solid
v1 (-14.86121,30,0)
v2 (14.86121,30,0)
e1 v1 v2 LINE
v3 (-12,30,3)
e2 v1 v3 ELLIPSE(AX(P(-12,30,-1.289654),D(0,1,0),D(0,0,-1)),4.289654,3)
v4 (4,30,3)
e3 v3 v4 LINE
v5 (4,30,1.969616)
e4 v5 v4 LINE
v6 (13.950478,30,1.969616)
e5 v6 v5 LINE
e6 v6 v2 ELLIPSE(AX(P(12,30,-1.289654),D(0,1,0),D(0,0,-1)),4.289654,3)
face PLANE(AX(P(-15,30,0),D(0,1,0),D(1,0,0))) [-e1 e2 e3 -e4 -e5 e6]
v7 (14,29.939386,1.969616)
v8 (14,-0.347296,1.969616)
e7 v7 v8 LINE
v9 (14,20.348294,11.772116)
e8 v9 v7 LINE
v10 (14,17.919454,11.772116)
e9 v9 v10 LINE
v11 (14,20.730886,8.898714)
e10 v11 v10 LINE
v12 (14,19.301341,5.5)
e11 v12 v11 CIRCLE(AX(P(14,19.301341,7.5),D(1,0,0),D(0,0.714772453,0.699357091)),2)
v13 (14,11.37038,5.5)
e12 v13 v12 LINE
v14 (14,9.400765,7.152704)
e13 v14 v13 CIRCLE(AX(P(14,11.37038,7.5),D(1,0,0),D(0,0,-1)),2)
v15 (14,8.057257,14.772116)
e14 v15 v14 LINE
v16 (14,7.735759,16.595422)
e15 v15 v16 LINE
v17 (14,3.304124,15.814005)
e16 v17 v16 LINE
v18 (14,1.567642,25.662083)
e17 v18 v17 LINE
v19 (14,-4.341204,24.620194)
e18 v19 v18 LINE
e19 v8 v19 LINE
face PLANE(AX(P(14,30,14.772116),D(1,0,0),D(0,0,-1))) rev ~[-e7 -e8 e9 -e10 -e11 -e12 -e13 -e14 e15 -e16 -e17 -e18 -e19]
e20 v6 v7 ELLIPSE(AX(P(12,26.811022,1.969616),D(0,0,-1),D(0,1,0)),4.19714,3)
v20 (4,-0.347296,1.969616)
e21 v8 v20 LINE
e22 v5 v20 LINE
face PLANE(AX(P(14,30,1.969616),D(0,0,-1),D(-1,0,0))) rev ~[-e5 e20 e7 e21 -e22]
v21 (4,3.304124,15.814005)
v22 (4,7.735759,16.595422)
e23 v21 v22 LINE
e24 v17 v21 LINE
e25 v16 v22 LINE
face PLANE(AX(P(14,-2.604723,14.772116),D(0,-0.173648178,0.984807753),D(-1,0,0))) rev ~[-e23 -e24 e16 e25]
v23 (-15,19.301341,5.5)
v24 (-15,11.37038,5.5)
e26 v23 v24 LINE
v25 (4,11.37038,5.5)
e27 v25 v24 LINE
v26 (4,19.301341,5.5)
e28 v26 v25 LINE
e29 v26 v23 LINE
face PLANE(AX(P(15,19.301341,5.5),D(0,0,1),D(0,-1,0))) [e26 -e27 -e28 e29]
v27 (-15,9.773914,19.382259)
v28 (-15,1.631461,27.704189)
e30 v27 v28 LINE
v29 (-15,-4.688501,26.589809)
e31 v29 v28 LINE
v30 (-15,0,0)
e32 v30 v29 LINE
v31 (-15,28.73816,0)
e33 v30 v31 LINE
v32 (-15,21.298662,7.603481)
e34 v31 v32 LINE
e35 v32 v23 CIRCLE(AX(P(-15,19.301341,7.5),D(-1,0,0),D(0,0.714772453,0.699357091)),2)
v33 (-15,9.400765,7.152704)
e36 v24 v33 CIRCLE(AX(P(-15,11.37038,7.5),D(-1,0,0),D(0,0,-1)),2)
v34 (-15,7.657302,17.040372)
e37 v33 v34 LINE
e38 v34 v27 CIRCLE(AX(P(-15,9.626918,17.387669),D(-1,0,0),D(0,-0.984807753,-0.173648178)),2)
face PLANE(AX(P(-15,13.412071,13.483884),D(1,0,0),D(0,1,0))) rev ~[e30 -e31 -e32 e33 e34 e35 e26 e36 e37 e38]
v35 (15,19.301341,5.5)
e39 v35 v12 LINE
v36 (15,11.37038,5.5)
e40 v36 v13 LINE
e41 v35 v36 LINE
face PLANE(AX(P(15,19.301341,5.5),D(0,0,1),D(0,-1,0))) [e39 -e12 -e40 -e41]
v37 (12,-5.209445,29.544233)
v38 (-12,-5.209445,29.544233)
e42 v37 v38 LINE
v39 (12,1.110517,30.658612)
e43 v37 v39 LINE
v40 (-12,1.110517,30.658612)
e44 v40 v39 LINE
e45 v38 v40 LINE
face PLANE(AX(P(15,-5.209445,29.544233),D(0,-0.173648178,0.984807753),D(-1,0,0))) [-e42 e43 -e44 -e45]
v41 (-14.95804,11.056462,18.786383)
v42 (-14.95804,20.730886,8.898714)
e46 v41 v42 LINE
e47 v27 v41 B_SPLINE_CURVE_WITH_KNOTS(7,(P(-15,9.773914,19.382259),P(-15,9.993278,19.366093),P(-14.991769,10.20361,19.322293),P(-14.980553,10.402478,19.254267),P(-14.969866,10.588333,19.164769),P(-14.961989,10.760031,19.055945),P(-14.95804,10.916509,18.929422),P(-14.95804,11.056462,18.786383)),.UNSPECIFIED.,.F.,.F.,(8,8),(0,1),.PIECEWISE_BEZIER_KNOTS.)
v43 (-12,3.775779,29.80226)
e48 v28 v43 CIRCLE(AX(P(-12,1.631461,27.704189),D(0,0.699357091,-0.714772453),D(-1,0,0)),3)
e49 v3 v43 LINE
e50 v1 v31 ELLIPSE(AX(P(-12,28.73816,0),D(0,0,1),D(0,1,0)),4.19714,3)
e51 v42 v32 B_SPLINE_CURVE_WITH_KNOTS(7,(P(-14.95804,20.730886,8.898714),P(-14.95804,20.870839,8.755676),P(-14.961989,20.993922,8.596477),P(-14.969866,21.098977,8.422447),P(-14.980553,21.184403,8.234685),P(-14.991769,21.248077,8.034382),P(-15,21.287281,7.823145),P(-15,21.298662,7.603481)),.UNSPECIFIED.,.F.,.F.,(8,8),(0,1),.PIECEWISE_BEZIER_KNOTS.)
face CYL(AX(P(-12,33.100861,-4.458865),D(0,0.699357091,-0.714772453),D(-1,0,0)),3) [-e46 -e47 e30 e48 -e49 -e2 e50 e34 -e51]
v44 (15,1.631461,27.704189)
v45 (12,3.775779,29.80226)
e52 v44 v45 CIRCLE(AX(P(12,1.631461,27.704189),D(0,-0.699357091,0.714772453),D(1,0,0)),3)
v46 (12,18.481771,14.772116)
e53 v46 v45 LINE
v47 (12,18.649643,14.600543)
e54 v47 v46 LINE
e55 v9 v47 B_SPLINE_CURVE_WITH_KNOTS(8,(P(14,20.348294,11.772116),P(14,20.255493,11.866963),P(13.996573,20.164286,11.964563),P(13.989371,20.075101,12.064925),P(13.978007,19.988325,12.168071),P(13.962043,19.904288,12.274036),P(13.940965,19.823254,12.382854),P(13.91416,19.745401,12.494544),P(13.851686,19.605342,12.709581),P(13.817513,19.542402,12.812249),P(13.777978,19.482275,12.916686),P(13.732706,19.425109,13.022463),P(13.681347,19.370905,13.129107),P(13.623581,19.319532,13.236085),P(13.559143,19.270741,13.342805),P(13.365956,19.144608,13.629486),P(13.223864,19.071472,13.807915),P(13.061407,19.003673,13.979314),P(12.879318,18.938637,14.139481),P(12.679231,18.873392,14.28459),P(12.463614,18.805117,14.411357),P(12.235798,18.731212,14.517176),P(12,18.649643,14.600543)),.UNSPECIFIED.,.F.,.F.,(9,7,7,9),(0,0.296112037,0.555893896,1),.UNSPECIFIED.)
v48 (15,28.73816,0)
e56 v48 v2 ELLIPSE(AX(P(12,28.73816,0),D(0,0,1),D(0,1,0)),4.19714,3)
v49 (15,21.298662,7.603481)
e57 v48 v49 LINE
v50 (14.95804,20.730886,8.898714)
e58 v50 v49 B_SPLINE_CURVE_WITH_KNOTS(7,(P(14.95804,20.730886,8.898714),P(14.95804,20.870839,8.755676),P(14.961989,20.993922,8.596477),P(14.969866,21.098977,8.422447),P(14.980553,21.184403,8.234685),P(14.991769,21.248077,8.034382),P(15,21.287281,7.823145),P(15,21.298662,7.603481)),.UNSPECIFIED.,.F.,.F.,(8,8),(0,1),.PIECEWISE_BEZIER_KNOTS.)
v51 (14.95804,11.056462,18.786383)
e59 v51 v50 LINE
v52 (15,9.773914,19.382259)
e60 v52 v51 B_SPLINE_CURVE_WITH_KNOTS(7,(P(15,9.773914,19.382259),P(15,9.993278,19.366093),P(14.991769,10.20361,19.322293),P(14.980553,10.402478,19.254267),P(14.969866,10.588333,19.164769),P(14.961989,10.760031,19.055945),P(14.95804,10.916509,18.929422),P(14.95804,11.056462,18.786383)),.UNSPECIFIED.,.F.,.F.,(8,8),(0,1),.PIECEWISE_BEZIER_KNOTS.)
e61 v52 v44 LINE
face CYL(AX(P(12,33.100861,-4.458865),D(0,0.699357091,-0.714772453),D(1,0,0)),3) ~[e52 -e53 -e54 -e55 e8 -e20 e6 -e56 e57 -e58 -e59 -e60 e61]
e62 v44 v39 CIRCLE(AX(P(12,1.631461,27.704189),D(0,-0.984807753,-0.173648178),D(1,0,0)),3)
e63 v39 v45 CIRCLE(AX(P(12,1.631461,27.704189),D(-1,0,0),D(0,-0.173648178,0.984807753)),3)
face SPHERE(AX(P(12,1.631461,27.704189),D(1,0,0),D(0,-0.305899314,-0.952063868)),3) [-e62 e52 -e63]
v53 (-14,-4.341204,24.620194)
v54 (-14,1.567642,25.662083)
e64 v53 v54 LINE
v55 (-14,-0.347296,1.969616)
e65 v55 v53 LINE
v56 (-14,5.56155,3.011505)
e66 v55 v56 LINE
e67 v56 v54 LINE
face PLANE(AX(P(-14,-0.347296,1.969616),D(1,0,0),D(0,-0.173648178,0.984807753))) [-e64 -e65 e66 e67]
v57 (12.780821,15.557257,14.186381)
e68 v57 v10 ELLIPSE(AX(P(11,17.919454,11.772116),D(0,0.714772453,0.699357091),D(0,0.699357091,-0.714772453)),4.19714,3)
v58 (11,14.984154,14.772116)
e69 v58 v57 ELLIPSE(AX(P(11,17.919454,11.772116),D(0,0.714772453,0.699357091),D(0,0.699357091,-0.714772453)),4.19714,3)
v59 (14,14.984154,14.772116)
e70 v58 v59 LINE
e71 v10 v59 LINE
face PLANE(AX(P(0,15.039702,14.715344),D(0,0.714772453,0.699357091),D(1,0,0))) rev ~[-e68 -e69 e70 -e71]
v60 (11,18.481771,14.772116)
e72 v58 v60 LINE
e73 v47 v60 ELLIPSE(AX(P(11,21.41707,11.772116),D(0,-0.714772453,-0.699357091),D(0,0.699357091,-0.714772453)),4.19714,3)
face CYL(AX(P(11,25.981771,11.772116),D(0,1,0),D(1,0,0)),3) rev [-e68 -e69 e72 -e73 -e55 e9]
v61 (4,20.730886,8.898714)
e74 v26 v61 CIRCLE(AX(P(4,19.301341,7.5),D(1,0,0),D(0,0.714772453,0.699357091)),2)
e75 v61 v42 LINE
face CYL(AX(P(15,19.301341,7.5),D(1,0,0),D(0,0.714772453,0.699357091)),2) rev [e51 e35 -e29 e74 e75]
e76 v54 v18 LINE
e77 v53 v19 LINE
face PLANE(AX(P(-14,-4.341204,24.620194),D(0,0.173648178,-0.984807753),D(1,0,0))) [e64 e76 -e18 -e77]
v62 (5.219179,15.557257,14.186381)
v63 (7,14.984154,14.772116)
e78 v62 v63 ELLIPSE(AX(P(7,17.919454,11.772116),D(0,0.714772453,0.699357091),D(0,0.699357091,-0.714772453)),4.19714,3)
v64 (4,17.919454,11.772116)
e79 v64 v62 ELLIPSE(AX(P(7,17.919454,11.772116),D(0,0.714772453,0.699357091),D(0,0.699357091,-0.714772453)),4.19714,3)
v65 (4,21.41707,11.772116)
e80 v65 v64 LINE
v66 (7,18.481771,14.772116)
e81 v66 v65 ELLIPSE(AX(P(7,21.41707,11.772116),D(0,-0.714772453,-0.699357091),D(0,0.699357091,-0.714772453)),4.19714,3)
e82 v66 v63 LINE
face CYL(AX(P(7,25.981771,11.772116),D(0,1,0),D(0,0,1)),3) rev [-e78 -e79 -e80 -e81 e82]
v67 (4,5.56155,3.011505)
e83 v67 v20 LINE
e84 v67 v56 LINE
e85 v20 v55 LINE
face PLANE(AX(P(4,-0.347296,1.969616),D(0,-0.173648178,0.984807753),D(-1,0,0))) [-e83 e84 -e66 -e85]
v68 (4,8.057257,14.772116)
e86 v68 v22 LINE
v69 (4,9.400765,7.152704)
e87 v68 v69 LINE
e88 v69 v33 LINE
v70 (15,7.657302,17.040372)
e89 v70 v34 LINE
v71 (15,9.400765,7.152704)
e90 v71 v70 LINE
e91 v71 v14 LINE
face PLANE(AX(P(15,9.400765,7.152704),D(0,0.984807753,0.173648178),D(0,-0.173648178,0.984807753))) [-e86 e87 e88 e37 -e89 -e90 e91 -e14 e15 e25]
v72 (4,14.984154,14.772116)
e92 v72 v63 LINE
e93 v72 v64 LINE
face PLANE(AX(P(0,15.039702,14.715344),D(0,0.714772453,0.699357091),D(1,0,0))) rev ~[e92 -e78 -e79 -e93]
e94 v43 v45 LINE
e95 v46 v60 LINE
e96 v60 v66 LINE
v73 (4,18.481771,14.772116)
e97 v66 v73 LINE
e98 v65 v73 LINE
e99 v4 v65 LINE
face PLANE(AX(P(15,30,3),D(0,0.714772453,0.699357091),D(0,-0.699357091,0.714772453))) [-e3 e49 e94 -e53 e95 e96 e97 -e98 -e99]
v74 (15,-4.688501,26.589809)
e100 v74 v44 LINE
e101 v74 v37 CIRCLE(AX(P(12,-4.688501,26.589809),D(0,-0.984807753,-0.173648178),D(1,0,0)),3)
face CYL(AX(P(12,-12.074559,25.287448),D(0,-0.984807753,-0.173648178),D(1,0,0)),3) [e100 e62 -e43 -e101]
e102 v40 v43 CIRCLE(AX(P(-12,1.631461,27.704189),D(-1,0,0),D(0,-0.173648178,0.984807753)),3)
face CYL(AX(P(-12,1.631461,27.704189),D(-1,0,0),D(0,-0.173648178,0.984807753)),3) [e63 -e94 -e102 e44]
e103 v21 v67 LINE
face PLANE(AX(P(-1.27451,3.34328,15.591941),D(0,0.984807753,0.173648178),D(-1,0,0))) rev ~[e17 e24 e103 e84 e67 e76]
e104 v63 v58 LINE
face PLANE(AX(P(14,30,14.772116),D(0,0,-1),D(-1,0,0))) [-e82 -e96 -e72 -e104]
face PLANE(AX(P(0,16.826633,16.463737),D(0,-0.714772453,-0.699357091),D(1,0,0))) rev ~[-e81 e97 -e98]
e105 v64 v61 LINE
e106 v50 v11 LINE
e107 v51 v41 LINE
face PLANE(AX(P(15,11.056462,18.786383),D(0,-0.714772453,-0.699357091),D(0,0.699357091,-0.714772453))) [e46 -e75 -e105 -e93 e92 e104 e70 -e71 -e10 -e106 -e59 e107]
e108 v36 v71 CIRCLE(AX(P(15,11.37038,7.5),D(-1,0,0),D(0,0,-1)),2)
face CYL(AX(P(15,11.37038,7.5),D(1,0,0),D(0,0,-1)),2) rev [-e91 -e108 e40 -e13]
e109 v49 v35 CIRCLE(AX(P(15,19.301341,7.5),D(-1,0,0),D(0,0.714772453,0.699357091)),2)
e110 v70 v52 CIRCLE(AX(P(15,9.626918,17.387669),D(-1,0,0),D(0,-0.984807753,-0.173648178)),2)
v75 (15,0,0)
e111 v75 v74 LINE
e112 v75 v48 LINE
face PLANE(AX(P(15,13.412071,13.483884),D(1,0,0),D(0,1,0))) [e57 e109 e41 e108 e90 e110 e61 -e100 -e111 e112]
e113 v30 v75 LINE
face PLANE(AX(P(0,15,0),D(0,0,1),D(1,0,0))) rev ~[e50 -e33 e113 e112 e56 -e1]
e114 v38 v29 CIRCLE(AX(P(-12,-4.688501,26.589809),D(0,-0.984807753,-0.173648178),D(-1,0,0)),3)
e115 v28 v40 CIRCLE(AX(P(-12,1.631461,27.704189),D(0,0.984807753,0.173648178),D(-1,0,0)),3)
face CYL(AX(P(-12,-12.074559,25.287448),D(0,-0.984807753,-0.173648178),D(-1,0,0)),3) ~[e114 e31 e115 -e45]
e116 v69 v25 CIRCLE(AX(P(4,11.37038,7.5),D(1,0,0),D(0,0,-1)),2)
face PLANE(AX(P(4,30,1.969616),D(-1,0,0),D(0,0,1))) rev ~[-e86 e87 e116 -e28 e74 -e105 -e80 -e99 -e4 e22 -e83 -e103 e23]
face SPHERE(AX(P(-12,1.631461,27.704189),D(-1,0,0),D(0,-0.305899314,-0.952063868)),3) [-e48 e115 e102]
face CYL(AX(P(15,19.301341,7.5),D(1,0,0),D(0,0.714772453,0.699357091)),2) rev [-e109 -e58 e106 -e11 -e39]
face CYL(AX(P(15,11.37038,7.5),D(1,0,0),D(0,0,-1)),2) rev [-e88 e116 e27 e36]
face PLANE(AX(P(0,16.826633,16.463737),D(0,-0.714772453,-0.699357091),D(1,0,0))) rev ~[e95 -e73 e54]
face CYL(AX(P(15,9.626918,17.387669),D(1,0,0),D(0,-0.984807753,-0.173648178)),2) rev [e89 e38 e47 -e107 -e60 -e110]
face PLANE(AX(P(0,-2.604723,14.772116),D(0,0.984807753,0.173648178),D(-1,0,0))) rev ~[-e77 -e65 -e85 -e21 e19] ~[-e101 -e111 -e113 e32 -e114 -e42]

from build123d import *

# Parameters (mm, degrees)
F0_W          = 30
F0_H          = 30
F4_DEPTH      = 3
F3_W          = 30
F3_H          = 30
F5_DEPTH      = 8
F6_DEPTH      = 25
F8_DEPTH      = 6.0000000522
F10_DEPTH     = 30
F7_W          = 10
F7_H          = 11.7721162952
F7_H_2        = 1.030384494
F11_DEPTH     = 35.21044533
F12_T4_DEPTH  = 18.4976166065
F12_T10_DEPTH = 18.4976166065
F12_T15_DEPTH = 17.5385665297
F12_T20_DEPTH = 17.5385665297
F12_T26_DEPTH = 17.5385665297
F12_T31_DEPTH = 17.5385665297
F12_T37_DEPTH = 18.4976166065
F12_T43_DEPTH = 18.4976166065
F12_T45_DEPTH = 13.9174578279
F12_T47_DEPTH = 24
F12_T49_DEPTH = 44.997612514
F12_T54_DEPTH = 3
F12_T60_DEPTH = 3
F3_W_2        = 10
F3_H_2        = 13
F13_DEPTH     = 5.1313021672
F14_DEPTH     = 10.5


# Not quite as in the source:
# - a fillet or chamfer that OpenCascade refuses, or shapes differently, is made with other operations: its cross-section is extruded or revolved along the edge and cut away or added


with BuildPart() as f4:
    # F0 (on Top) → F4 (new body)
    with BuildSketch(Plane.XY):
        with Locations((0, 15)):
            Rectangle(F0_W, F0_H)
    extrude(amount=F4_DEPTH)

    # F3 (on 3pt) → F5 (join)
    with BuildSketch(Plane(origin=(0, 0, 0), x_dir=(-1, 0, 0), z_dir=(0, 0.984807753, 0.1736481777))):
        with Locations((0, 15)):
            Rectangle(F3_W, F3_H)
        Polygon((-14, 2), (-14, 15), (-14, 25), (14, 25), (14, 2), (-4, 2), align=None, mode=Mode.SUBTRACT)
        Polygon((-14, 25), (-14, 15), (-4, 15), (-4, 2), (14, 2), (14, 25), align=None)
    extrude(amount=F5_DEPTH)

    # F0 (on Top) → F6 (cut)
    with BuildSketch(Plane.XY):
        with Locations((0, 15)):
            Rectangle(F0_W, F0_H)
    extrude(amount=-F6_DEPTH, mode=Mode.SUBTRACT)

    # F3 (on 3pt) → F8 (cut)
    with BuildSketch(Plane(origin=(0, 0, 0), x_dir=(-1, 0, 0), z_dir=(0, 0.984807753, 0.1736481777))):
        Polygon((-14, 25), (-14, 15), (-4, 15), (-4, 2), (14, 2), (14, 25), align=None)
    extrude(amount=F8_DEPTH, mode=Mode.SUBTRACT)

    # F9 (on face) → F10 (join, through all)
    with BuildSketch(Plane.YZ.offset(15)):
        Polygon((30, 3), (2.6690166941, 30.9334180117), (7.594431953, 3), align=None)
        with BuildLine():
            ThreePointArc((11.3703802933, 5.5), (10.0848050739, 5.9679111138), (9.4007647872, 7.1527036447))
            Line((9.4007647872, 7.1527036447), (7.6573020205, 17.0403723366))
            ThreePointArc((7.6573020205, 17.0403723366), (8.7131028501, 19.1666972856), (11.0564624317, 18.7863828744))
            Line((11.0564624317, 18.7863828744), (20.7308856563, 8.8987141825))
            ThreePointArc((20.7308856563, 8.8987141825), (21.1449009434, 6.7245737833), (19.3013407511, 5.5))
            Line((19.3013407511, 5.5), (11.3703802933, 5.5))
        make_face(mode=Mode.SUBTRACT)
    extrude(amount=-F10_DEPTH)

    # F7 (on face) → F11 (cut, through all)
    with BuildSketch(Plane(origin=(0, 30, 0), x_dir=(-1, 0, 0), z_dir=(0, 1, 0))):
        with Locations((-9, 8.8860581476)):
            Rectangle(F7_W, F7_H)
        with Locations((-9, 2.484807753)):
            Rectangle(F7_W, F7_H_2)
    extrude(amount=-F11_DEPTH, mode=Mode.SUBTRACT)

    # F12: fillet of radius 3 on 9 edges, made by hand


with BuildPart() as f12_tool2:
    # F12_s3 → F12_t4 (new body)
    with BuildSketch(Plane.XZ.offset(-25.9817706947)):
        with BuildLine():
            ThreePointArc((7, 14.7721162952), (4.8786796564, 13.8934366387), (4, 11.7721162952))
            Line((4, 11.7721162952), (4, 14.7721162952))
            Line((4, 14.7721162952), (7, 14.7721162952))
        make_face()
    extrude(amount=F12_T4_DEPTH)

    split(bisect_by=Plane(origin=(0, 16.8266333185, 16.4637365227), x_dir=(1, 0, 0), z_dir=(0, -0.7147724526, -0.6993570912)), keep=Keep.TOP)

    split(bisect_by=Plane(origin=(0, 15.0397021871, 14.7153437946), x_dir=(1, 0, 0), z_dir=(0, 0.7147724526, 0.6993570912)), keep=Keep.TOP)


with BuildPart() as f4_1:
    add(f4.part)

    # F12_t1: union F12_tool2
    add(f12_tool2.part)


with BuildPart() as f12_tool8:
    # F12_s9 → F12_t10 (new body)
    with BuildSketch(Plane.XZ.offset(-25.9817706947)):
        with BuildLine():
            ThreePointArc((7, 14.7721162952), (4.8786796564, 13.8934366387), (4, 11.7721162952))
            Line((4, 11.7721162952), (4, 14.7721162952))
            Line((4, 14.7721162952), (7, 14.7721162952))
        make_face()
    extrude(amount=F12_T10_DEPTH)

    split(bisect_by=Plane(origin=(0, 10.3404814066, 1.8233058655), x_dir=(1, 0, 0), z_dir=(0, -0.984807753, -0.1736481777)), keep=Keep.TOP)


with BuildPart() as f4_2:
    add(f4_1.part)

    # F12_t7: union F12_tool8
    add(f12_tool8.part)


with BuildPart() as f12_tool13:
    # F12_s14 → F12_t15 (new body)
    with BuildSketch(Plane.XZ.offset(-15.5572567598)):
        with BuildLine():
            ThreePointArc((7, 14.7721162952), (4.8786796564, 13.8934366387), (4, 11.7721162952))
            Line((4, 11.7721162952), (4, 14.7721162952))
            Line((4, 14.7721162952), (7, 14.7721162952))
        make_face()
    extrude(amount=F12_T15_DEPTH)

    split(bisect_by=Plane(origin=(0, 15.0397021871, 14.7153437946), x_dir=(1, 0, 0), z_dir=(0, 0.7147724526, 0.6993570912)), keep=Keep.TOP)


with BuildPart() as f4_3:
    add(f4_2.part)

    # F12_t12: union F12_tool13
    add(f12_tool13.part)


with BuildPart() as f12_tool18:
    # F12_s19 → F12_t20 (new body)
    with BuildSketch(Plane.XZ.offset(-15.5572567598)):
        with BuildLine():
            ThreePointArc((7, 14.7721162952), (4.8786796564, 13.8934366387), (4, 11.7721162952))
            Line((4, 11.7721162952), (4, 14.7721162952))
            Line((4, 14.7721162952), (7, 14.7721162952))
        make_face()
    extrude(amount=F12_T20_DEPTH)

    split(bisect_by=Plane(origin=(0, 10.3404814066, 1.8233058655), x_dir=(1, 0, 0), z_dir=(0, -0.984807753, -0.1736481777)), keep=Keep.TOP)

    split(bisect_by=Plane(origin=(0, 7.8784620241, 1.3891854213), x_dir=(1, 0, 0), z_dir=(0, 0.984807753, 0.1736481777)), keep=Keep.TOP)


with BuildPart() as f4_4:
    add(f4_3.part)

    # F12_t17: union F12_tool18
    add(f12_tool18.part)


with BuildPart() as f12_tool24:
    # F12_s25 → F12_t26 (new body)
    with BuildSketch(Plane.XZ.offset(-15.5572567598)):
        with BuildLine():
            ThreePointArc((14, 11.7721162952), (13.1213203436, 13.8934366387), (11, 14.7721162952))
            Line((11, 14.7721162952), (14, 14.7721162952))
            Line((14, 14.7721162952), (14, 11.7721162952))
        make_face()
    extrude(amount=F12_T26_DEPTH)

    split(bisect_by=Plane(origin=(0, 15.0397021871, 14.7153437946), x_dir=(1, 0, 0), z_dir=(0, 0.7147724526, 0.6993570912)), keep=Keep.TOP)


with BuildPart() as f4_5:
    add(f4_4.part)

    # F12_t23: union F12_tool24
    add(f12_tool24.part)


with BuildPart() as f12_tool29:
    # F12_s30 → F12_t31 (new body)
    with BuildSketch(Plane.XZ.offset(-15.5572567598)):
        with BuildLine():
            ThreePointArc((14, 11.7721162952), (13.1213203436, 13.8934366387), (11, 14.7721162952))
            Line((11, 14.7721162952), (14, 14.7721162952))
            Line((14, 14.7721162952), (14, 11.7721162952))
        make_face()
    extrude(amount=F12_T31_DEPTH)

    split(bisect_by=Plane(origin=(0, 10.3404814066, 1.8233058655), x_dir=(1, 0, 0), z_dir=(0, -0.984807753, -0.1736481777)), keep=Keep.TOP)

    split(bisect_by=Plane(origin=(0, 7.8784620241, 1.3891854213), x_dir=(1, 0, 0), z_dir=(0, 0.984807753, 0.1736481777)), keep=Keep.TOP)


with BuildPart() as f4_6:
    add(f4_5.part)

    # F12_t28: union F12_tool29
    add(f12_tool29.part)


with BuildPart() as f12_tool35:
    # F12_s36 → F12_t37 (new body)
    with BuildSketch(Plane.XZ.offset(-25.9817706947)):
        with BuildLine():
            ThreePointArc((14, 11.7721162952), (13.1213203436, 13.8934366387), (11, 14.7721162952))
            Line((11, 14.7721162952), (14, 14.7721162952))
            Line((14, 14.7721162952), (14, 11.7721162952))
        make_face()
    extrude(amount=F12_T37_DEPTH)

    split(bisect_by=Plane(origin=(0, 16.8266333185, 16.4637365227), x_dir=(1, 0, 0), z_dir=(0, -0.7147724526, -0.6993570912)), keep=Keep.TOP)

    split(bisect_by=Plane(origin=(0, 15.0397021871, 14.7153437946), x_dir=(1, 0, 0), z_dir=(0, 0.7147724526, 0.6993570912)), keep=Keep.TOP)


with BuildPart() as f4_7:
    add(f4_6.part)

    # F12_t34: union F12_tool35
    add(f12_tool35.part)


with BuildPart() as f12_tool41:
    # F12_s42 → F12_t43 (new body)
    with BuildSketch(Plane.XZ.offset(-25.9817706947)):
        with BuildLine():
            ThreePointArc((14, 11.7721162952), (13.1213203436, 13.8934366387), (11, 14.7721162952))
            Line((11, 14.7721162952), (14, 14.7721162952))
            Line((14, 14.7721162952), (14, 11.7721162952))
        make_face()
    extrude(amount=F12_T43_DEPTH)

    split(bisect_by=Plane(origin=(0, 10.3404814066, 1.8233058655), x_dir=(1, 0, 0), z_dir=(0, -0.984807753, -0.1736481777)), keep=Keep.TOP)


with BuildPart() as f4_8:
    add(f4_7.part)

    # F12_t40: union F12_tool41
    add(f12_tool41.part)

    # F12_s46 → F12_t45 (cut)
    with BuildSketch(Plane(origin=(0, -7.3860581476, -1.3023613325), x_dir=(1, 0, 0), z_dir=(0, 0.984807753, 0.1736481777))):
        with BuildLine():
            ThreePointArc((-15, -27), (-14.1213203436, -29.1213203436), (-12, -30))
            Line((-12, -30), (-15, -30))
            Line((-15, -30), (-15, -27))
        make_face()
        with BuildLine():
            ThreePointArc((15, -27), (14.1213203436, -29.1213203436), (12, -30))
            Line((12, -30), (15, -30))
            Line((15, -30), (15, -27))
        make_face()
    extrude(amount=F12_T45_DEPTH, mode=Mode.SUBTRACT)

    # F12_s48 → F12_t47 (cut)
    with BuildSketch(Plane.YZ.offset(-12)):
        with BuildLine():
            ThreePointArc((1.1105168936, 30.6586124474), (2.5491593686, 30.5603807939), (3.7757787843, 29.8022604621))
            Line((3.7757787843, 29.8022604621), (2.6690166941, 30.9334180117))
            Line((2.6690166941, 30.9334180117), (1.1105168936, 30.6586124474))
        make_face()
    extrude(amount=F12_T47_DEPTH, mode=Mode.SUBTRACT)

    # F12_s50 → F12_t49 (cut)
    with BuildSketch(Plane(origin=(0, 18.4185448657, -18.8245299169), x_dir=(1, 0, 0), z_dir=(0, -0.6993570912, 0.7147724526))):
        with BuildLine():
            ThreePointArc((-15, 20.5412448507), (-14.1213203436, 22.6625651943), (-12, 23.5412448507))
            Line((-12, 23.5412448507), (-15, 23.5412448507))
            Line((-15, 23.5412448507), (-15, 20.5412448507))
        make_face()
        with BuildLine():
            ThreePointArc((15, 20.5412448507), (14.1213203436, 22.6625651943), (12, 23.5412448507))
            Line((12, 23.5412448507), (15, 23.5412448507))
            Line((15, 23.5412448507), (15, 20.5412448507))
        make_face()
    extrude(amount=F12_T49_DEPTH, mode=Mode.SUBTRACT)


with BuildPart() as f12_tool52:
    # F12_s53 → F12_t54 (new body)
    with BuildSketch(Plane.YZ.offset(-12)):
        Polygon((1.6314614266, 27.7041891884), (1.1105168936, 30.6586124474), (2.6690166941, 30.9334180117), (3.7757787843, 29.8022604621), align=None)
    extrude(amount=-F12_T54_DEPTH)

    # F12_s55 → F12_t56 (revolve, cut)
    with BuildSketch(Plane(origin=(-12, 1.6314614266, 27.7041891884), x_dir=(0, -0.305899314, -0.9520638685), z_dir=(0, 0.9520638685, -0.305899314))):
        with BuildLine():
            ThreePointArc((0, -3), (3, 0), (0, 3))
            Line((0, 3), (0, -3))
        make_face()
    revolve(axis=Axis((-12, 1.6314614266, 27.7041891884), (-1, 0, 0)), mode=Mode.SUBTRACT)


with BuildPart() as f4_9:
    add(f4_8.part)

    # F12_t51: cut F12_tool52
    add(f12_tool52.part, mode=Mode.SUBTRACT)


with BuildPart() as f12_tool58:
    # F12_s59 → F12_t60 (new body)
    with BuildSketch(Plane.YZ.offset(12)):
        Polygon((1.6314614266, 27.7041891884), (3.7757787843, 29.8022604621), (2.6690166941, 30.9334180117), (1.1105168936, 30.6586124474), align=None)
    extrude(amount=F12_T60_DEPTH)

    # F12_s61 → F12_t62 (revolve, cut)
    with BuildSketch(Plane(origin=(12, 1.6314614266, 27.7041891884), x_dir=(0, -0.305899314, -0.9520638685), z_dir=(0, -0.9520638685, 0.305899314))):
        with BuildLine():
            ThreePointArc((0, -3), (3, 0), (0, 3))
            Line((0, 3), (0, -3))
        make_face()
    revolve(axis=Axis((12, 1.6314614266, 27.7041891884), (1, 0, 0)), mode=Mode.SUBTRACT)


with BuildPart() as f4_10:
    add(f4_9.part)

    # F12_t57: cut F12_tool58
    add(f12_tool58.part, mode=Mode.SUBTRACT)

    # F3 (on 3pt) → F13 (cut, through all)
    with BuildSketch(Plane(origin=(0, 0, 0), x_dir=(-1, 0, 0), z_dir=(0, 0.984807753, 0.1736481777))):
        with Locations((0, 15)):
            Rectangle(F3_W, F3_H)
        Polygon((-14, 2), (-14, 15), (-14, 25), (14, 25), (14, 2), (-4, 2), align=None, mode=Mode.SUBTRACT)
        Polygon((-14, 25), (-14, 15), (-4, 15), (-4, 2), (14, 2), (14, 25), align=None)
        with Locations((-9, 8.5)):
            Rectangle(F3_W_2, F3_H_2)
    extrude(amount=-F13_DEPTH, mode=Mode.SUBTRACT)

    # F3 (on 3pt) → F14 (cut, through all)
    with BuildSketch(Plane(origin=(0, 0, 0), x_dir=(-1, 0, 0), z_dir=(0, 0.984807753, 0.1736481777))):
        with Locations((-9, 8.5)):
            Rectangle(F3_W_2, F3_H_2)
    extrude(amount=F14_DEPTH, mode=Mode.SUBTRACT)


solid = f4_10.part
